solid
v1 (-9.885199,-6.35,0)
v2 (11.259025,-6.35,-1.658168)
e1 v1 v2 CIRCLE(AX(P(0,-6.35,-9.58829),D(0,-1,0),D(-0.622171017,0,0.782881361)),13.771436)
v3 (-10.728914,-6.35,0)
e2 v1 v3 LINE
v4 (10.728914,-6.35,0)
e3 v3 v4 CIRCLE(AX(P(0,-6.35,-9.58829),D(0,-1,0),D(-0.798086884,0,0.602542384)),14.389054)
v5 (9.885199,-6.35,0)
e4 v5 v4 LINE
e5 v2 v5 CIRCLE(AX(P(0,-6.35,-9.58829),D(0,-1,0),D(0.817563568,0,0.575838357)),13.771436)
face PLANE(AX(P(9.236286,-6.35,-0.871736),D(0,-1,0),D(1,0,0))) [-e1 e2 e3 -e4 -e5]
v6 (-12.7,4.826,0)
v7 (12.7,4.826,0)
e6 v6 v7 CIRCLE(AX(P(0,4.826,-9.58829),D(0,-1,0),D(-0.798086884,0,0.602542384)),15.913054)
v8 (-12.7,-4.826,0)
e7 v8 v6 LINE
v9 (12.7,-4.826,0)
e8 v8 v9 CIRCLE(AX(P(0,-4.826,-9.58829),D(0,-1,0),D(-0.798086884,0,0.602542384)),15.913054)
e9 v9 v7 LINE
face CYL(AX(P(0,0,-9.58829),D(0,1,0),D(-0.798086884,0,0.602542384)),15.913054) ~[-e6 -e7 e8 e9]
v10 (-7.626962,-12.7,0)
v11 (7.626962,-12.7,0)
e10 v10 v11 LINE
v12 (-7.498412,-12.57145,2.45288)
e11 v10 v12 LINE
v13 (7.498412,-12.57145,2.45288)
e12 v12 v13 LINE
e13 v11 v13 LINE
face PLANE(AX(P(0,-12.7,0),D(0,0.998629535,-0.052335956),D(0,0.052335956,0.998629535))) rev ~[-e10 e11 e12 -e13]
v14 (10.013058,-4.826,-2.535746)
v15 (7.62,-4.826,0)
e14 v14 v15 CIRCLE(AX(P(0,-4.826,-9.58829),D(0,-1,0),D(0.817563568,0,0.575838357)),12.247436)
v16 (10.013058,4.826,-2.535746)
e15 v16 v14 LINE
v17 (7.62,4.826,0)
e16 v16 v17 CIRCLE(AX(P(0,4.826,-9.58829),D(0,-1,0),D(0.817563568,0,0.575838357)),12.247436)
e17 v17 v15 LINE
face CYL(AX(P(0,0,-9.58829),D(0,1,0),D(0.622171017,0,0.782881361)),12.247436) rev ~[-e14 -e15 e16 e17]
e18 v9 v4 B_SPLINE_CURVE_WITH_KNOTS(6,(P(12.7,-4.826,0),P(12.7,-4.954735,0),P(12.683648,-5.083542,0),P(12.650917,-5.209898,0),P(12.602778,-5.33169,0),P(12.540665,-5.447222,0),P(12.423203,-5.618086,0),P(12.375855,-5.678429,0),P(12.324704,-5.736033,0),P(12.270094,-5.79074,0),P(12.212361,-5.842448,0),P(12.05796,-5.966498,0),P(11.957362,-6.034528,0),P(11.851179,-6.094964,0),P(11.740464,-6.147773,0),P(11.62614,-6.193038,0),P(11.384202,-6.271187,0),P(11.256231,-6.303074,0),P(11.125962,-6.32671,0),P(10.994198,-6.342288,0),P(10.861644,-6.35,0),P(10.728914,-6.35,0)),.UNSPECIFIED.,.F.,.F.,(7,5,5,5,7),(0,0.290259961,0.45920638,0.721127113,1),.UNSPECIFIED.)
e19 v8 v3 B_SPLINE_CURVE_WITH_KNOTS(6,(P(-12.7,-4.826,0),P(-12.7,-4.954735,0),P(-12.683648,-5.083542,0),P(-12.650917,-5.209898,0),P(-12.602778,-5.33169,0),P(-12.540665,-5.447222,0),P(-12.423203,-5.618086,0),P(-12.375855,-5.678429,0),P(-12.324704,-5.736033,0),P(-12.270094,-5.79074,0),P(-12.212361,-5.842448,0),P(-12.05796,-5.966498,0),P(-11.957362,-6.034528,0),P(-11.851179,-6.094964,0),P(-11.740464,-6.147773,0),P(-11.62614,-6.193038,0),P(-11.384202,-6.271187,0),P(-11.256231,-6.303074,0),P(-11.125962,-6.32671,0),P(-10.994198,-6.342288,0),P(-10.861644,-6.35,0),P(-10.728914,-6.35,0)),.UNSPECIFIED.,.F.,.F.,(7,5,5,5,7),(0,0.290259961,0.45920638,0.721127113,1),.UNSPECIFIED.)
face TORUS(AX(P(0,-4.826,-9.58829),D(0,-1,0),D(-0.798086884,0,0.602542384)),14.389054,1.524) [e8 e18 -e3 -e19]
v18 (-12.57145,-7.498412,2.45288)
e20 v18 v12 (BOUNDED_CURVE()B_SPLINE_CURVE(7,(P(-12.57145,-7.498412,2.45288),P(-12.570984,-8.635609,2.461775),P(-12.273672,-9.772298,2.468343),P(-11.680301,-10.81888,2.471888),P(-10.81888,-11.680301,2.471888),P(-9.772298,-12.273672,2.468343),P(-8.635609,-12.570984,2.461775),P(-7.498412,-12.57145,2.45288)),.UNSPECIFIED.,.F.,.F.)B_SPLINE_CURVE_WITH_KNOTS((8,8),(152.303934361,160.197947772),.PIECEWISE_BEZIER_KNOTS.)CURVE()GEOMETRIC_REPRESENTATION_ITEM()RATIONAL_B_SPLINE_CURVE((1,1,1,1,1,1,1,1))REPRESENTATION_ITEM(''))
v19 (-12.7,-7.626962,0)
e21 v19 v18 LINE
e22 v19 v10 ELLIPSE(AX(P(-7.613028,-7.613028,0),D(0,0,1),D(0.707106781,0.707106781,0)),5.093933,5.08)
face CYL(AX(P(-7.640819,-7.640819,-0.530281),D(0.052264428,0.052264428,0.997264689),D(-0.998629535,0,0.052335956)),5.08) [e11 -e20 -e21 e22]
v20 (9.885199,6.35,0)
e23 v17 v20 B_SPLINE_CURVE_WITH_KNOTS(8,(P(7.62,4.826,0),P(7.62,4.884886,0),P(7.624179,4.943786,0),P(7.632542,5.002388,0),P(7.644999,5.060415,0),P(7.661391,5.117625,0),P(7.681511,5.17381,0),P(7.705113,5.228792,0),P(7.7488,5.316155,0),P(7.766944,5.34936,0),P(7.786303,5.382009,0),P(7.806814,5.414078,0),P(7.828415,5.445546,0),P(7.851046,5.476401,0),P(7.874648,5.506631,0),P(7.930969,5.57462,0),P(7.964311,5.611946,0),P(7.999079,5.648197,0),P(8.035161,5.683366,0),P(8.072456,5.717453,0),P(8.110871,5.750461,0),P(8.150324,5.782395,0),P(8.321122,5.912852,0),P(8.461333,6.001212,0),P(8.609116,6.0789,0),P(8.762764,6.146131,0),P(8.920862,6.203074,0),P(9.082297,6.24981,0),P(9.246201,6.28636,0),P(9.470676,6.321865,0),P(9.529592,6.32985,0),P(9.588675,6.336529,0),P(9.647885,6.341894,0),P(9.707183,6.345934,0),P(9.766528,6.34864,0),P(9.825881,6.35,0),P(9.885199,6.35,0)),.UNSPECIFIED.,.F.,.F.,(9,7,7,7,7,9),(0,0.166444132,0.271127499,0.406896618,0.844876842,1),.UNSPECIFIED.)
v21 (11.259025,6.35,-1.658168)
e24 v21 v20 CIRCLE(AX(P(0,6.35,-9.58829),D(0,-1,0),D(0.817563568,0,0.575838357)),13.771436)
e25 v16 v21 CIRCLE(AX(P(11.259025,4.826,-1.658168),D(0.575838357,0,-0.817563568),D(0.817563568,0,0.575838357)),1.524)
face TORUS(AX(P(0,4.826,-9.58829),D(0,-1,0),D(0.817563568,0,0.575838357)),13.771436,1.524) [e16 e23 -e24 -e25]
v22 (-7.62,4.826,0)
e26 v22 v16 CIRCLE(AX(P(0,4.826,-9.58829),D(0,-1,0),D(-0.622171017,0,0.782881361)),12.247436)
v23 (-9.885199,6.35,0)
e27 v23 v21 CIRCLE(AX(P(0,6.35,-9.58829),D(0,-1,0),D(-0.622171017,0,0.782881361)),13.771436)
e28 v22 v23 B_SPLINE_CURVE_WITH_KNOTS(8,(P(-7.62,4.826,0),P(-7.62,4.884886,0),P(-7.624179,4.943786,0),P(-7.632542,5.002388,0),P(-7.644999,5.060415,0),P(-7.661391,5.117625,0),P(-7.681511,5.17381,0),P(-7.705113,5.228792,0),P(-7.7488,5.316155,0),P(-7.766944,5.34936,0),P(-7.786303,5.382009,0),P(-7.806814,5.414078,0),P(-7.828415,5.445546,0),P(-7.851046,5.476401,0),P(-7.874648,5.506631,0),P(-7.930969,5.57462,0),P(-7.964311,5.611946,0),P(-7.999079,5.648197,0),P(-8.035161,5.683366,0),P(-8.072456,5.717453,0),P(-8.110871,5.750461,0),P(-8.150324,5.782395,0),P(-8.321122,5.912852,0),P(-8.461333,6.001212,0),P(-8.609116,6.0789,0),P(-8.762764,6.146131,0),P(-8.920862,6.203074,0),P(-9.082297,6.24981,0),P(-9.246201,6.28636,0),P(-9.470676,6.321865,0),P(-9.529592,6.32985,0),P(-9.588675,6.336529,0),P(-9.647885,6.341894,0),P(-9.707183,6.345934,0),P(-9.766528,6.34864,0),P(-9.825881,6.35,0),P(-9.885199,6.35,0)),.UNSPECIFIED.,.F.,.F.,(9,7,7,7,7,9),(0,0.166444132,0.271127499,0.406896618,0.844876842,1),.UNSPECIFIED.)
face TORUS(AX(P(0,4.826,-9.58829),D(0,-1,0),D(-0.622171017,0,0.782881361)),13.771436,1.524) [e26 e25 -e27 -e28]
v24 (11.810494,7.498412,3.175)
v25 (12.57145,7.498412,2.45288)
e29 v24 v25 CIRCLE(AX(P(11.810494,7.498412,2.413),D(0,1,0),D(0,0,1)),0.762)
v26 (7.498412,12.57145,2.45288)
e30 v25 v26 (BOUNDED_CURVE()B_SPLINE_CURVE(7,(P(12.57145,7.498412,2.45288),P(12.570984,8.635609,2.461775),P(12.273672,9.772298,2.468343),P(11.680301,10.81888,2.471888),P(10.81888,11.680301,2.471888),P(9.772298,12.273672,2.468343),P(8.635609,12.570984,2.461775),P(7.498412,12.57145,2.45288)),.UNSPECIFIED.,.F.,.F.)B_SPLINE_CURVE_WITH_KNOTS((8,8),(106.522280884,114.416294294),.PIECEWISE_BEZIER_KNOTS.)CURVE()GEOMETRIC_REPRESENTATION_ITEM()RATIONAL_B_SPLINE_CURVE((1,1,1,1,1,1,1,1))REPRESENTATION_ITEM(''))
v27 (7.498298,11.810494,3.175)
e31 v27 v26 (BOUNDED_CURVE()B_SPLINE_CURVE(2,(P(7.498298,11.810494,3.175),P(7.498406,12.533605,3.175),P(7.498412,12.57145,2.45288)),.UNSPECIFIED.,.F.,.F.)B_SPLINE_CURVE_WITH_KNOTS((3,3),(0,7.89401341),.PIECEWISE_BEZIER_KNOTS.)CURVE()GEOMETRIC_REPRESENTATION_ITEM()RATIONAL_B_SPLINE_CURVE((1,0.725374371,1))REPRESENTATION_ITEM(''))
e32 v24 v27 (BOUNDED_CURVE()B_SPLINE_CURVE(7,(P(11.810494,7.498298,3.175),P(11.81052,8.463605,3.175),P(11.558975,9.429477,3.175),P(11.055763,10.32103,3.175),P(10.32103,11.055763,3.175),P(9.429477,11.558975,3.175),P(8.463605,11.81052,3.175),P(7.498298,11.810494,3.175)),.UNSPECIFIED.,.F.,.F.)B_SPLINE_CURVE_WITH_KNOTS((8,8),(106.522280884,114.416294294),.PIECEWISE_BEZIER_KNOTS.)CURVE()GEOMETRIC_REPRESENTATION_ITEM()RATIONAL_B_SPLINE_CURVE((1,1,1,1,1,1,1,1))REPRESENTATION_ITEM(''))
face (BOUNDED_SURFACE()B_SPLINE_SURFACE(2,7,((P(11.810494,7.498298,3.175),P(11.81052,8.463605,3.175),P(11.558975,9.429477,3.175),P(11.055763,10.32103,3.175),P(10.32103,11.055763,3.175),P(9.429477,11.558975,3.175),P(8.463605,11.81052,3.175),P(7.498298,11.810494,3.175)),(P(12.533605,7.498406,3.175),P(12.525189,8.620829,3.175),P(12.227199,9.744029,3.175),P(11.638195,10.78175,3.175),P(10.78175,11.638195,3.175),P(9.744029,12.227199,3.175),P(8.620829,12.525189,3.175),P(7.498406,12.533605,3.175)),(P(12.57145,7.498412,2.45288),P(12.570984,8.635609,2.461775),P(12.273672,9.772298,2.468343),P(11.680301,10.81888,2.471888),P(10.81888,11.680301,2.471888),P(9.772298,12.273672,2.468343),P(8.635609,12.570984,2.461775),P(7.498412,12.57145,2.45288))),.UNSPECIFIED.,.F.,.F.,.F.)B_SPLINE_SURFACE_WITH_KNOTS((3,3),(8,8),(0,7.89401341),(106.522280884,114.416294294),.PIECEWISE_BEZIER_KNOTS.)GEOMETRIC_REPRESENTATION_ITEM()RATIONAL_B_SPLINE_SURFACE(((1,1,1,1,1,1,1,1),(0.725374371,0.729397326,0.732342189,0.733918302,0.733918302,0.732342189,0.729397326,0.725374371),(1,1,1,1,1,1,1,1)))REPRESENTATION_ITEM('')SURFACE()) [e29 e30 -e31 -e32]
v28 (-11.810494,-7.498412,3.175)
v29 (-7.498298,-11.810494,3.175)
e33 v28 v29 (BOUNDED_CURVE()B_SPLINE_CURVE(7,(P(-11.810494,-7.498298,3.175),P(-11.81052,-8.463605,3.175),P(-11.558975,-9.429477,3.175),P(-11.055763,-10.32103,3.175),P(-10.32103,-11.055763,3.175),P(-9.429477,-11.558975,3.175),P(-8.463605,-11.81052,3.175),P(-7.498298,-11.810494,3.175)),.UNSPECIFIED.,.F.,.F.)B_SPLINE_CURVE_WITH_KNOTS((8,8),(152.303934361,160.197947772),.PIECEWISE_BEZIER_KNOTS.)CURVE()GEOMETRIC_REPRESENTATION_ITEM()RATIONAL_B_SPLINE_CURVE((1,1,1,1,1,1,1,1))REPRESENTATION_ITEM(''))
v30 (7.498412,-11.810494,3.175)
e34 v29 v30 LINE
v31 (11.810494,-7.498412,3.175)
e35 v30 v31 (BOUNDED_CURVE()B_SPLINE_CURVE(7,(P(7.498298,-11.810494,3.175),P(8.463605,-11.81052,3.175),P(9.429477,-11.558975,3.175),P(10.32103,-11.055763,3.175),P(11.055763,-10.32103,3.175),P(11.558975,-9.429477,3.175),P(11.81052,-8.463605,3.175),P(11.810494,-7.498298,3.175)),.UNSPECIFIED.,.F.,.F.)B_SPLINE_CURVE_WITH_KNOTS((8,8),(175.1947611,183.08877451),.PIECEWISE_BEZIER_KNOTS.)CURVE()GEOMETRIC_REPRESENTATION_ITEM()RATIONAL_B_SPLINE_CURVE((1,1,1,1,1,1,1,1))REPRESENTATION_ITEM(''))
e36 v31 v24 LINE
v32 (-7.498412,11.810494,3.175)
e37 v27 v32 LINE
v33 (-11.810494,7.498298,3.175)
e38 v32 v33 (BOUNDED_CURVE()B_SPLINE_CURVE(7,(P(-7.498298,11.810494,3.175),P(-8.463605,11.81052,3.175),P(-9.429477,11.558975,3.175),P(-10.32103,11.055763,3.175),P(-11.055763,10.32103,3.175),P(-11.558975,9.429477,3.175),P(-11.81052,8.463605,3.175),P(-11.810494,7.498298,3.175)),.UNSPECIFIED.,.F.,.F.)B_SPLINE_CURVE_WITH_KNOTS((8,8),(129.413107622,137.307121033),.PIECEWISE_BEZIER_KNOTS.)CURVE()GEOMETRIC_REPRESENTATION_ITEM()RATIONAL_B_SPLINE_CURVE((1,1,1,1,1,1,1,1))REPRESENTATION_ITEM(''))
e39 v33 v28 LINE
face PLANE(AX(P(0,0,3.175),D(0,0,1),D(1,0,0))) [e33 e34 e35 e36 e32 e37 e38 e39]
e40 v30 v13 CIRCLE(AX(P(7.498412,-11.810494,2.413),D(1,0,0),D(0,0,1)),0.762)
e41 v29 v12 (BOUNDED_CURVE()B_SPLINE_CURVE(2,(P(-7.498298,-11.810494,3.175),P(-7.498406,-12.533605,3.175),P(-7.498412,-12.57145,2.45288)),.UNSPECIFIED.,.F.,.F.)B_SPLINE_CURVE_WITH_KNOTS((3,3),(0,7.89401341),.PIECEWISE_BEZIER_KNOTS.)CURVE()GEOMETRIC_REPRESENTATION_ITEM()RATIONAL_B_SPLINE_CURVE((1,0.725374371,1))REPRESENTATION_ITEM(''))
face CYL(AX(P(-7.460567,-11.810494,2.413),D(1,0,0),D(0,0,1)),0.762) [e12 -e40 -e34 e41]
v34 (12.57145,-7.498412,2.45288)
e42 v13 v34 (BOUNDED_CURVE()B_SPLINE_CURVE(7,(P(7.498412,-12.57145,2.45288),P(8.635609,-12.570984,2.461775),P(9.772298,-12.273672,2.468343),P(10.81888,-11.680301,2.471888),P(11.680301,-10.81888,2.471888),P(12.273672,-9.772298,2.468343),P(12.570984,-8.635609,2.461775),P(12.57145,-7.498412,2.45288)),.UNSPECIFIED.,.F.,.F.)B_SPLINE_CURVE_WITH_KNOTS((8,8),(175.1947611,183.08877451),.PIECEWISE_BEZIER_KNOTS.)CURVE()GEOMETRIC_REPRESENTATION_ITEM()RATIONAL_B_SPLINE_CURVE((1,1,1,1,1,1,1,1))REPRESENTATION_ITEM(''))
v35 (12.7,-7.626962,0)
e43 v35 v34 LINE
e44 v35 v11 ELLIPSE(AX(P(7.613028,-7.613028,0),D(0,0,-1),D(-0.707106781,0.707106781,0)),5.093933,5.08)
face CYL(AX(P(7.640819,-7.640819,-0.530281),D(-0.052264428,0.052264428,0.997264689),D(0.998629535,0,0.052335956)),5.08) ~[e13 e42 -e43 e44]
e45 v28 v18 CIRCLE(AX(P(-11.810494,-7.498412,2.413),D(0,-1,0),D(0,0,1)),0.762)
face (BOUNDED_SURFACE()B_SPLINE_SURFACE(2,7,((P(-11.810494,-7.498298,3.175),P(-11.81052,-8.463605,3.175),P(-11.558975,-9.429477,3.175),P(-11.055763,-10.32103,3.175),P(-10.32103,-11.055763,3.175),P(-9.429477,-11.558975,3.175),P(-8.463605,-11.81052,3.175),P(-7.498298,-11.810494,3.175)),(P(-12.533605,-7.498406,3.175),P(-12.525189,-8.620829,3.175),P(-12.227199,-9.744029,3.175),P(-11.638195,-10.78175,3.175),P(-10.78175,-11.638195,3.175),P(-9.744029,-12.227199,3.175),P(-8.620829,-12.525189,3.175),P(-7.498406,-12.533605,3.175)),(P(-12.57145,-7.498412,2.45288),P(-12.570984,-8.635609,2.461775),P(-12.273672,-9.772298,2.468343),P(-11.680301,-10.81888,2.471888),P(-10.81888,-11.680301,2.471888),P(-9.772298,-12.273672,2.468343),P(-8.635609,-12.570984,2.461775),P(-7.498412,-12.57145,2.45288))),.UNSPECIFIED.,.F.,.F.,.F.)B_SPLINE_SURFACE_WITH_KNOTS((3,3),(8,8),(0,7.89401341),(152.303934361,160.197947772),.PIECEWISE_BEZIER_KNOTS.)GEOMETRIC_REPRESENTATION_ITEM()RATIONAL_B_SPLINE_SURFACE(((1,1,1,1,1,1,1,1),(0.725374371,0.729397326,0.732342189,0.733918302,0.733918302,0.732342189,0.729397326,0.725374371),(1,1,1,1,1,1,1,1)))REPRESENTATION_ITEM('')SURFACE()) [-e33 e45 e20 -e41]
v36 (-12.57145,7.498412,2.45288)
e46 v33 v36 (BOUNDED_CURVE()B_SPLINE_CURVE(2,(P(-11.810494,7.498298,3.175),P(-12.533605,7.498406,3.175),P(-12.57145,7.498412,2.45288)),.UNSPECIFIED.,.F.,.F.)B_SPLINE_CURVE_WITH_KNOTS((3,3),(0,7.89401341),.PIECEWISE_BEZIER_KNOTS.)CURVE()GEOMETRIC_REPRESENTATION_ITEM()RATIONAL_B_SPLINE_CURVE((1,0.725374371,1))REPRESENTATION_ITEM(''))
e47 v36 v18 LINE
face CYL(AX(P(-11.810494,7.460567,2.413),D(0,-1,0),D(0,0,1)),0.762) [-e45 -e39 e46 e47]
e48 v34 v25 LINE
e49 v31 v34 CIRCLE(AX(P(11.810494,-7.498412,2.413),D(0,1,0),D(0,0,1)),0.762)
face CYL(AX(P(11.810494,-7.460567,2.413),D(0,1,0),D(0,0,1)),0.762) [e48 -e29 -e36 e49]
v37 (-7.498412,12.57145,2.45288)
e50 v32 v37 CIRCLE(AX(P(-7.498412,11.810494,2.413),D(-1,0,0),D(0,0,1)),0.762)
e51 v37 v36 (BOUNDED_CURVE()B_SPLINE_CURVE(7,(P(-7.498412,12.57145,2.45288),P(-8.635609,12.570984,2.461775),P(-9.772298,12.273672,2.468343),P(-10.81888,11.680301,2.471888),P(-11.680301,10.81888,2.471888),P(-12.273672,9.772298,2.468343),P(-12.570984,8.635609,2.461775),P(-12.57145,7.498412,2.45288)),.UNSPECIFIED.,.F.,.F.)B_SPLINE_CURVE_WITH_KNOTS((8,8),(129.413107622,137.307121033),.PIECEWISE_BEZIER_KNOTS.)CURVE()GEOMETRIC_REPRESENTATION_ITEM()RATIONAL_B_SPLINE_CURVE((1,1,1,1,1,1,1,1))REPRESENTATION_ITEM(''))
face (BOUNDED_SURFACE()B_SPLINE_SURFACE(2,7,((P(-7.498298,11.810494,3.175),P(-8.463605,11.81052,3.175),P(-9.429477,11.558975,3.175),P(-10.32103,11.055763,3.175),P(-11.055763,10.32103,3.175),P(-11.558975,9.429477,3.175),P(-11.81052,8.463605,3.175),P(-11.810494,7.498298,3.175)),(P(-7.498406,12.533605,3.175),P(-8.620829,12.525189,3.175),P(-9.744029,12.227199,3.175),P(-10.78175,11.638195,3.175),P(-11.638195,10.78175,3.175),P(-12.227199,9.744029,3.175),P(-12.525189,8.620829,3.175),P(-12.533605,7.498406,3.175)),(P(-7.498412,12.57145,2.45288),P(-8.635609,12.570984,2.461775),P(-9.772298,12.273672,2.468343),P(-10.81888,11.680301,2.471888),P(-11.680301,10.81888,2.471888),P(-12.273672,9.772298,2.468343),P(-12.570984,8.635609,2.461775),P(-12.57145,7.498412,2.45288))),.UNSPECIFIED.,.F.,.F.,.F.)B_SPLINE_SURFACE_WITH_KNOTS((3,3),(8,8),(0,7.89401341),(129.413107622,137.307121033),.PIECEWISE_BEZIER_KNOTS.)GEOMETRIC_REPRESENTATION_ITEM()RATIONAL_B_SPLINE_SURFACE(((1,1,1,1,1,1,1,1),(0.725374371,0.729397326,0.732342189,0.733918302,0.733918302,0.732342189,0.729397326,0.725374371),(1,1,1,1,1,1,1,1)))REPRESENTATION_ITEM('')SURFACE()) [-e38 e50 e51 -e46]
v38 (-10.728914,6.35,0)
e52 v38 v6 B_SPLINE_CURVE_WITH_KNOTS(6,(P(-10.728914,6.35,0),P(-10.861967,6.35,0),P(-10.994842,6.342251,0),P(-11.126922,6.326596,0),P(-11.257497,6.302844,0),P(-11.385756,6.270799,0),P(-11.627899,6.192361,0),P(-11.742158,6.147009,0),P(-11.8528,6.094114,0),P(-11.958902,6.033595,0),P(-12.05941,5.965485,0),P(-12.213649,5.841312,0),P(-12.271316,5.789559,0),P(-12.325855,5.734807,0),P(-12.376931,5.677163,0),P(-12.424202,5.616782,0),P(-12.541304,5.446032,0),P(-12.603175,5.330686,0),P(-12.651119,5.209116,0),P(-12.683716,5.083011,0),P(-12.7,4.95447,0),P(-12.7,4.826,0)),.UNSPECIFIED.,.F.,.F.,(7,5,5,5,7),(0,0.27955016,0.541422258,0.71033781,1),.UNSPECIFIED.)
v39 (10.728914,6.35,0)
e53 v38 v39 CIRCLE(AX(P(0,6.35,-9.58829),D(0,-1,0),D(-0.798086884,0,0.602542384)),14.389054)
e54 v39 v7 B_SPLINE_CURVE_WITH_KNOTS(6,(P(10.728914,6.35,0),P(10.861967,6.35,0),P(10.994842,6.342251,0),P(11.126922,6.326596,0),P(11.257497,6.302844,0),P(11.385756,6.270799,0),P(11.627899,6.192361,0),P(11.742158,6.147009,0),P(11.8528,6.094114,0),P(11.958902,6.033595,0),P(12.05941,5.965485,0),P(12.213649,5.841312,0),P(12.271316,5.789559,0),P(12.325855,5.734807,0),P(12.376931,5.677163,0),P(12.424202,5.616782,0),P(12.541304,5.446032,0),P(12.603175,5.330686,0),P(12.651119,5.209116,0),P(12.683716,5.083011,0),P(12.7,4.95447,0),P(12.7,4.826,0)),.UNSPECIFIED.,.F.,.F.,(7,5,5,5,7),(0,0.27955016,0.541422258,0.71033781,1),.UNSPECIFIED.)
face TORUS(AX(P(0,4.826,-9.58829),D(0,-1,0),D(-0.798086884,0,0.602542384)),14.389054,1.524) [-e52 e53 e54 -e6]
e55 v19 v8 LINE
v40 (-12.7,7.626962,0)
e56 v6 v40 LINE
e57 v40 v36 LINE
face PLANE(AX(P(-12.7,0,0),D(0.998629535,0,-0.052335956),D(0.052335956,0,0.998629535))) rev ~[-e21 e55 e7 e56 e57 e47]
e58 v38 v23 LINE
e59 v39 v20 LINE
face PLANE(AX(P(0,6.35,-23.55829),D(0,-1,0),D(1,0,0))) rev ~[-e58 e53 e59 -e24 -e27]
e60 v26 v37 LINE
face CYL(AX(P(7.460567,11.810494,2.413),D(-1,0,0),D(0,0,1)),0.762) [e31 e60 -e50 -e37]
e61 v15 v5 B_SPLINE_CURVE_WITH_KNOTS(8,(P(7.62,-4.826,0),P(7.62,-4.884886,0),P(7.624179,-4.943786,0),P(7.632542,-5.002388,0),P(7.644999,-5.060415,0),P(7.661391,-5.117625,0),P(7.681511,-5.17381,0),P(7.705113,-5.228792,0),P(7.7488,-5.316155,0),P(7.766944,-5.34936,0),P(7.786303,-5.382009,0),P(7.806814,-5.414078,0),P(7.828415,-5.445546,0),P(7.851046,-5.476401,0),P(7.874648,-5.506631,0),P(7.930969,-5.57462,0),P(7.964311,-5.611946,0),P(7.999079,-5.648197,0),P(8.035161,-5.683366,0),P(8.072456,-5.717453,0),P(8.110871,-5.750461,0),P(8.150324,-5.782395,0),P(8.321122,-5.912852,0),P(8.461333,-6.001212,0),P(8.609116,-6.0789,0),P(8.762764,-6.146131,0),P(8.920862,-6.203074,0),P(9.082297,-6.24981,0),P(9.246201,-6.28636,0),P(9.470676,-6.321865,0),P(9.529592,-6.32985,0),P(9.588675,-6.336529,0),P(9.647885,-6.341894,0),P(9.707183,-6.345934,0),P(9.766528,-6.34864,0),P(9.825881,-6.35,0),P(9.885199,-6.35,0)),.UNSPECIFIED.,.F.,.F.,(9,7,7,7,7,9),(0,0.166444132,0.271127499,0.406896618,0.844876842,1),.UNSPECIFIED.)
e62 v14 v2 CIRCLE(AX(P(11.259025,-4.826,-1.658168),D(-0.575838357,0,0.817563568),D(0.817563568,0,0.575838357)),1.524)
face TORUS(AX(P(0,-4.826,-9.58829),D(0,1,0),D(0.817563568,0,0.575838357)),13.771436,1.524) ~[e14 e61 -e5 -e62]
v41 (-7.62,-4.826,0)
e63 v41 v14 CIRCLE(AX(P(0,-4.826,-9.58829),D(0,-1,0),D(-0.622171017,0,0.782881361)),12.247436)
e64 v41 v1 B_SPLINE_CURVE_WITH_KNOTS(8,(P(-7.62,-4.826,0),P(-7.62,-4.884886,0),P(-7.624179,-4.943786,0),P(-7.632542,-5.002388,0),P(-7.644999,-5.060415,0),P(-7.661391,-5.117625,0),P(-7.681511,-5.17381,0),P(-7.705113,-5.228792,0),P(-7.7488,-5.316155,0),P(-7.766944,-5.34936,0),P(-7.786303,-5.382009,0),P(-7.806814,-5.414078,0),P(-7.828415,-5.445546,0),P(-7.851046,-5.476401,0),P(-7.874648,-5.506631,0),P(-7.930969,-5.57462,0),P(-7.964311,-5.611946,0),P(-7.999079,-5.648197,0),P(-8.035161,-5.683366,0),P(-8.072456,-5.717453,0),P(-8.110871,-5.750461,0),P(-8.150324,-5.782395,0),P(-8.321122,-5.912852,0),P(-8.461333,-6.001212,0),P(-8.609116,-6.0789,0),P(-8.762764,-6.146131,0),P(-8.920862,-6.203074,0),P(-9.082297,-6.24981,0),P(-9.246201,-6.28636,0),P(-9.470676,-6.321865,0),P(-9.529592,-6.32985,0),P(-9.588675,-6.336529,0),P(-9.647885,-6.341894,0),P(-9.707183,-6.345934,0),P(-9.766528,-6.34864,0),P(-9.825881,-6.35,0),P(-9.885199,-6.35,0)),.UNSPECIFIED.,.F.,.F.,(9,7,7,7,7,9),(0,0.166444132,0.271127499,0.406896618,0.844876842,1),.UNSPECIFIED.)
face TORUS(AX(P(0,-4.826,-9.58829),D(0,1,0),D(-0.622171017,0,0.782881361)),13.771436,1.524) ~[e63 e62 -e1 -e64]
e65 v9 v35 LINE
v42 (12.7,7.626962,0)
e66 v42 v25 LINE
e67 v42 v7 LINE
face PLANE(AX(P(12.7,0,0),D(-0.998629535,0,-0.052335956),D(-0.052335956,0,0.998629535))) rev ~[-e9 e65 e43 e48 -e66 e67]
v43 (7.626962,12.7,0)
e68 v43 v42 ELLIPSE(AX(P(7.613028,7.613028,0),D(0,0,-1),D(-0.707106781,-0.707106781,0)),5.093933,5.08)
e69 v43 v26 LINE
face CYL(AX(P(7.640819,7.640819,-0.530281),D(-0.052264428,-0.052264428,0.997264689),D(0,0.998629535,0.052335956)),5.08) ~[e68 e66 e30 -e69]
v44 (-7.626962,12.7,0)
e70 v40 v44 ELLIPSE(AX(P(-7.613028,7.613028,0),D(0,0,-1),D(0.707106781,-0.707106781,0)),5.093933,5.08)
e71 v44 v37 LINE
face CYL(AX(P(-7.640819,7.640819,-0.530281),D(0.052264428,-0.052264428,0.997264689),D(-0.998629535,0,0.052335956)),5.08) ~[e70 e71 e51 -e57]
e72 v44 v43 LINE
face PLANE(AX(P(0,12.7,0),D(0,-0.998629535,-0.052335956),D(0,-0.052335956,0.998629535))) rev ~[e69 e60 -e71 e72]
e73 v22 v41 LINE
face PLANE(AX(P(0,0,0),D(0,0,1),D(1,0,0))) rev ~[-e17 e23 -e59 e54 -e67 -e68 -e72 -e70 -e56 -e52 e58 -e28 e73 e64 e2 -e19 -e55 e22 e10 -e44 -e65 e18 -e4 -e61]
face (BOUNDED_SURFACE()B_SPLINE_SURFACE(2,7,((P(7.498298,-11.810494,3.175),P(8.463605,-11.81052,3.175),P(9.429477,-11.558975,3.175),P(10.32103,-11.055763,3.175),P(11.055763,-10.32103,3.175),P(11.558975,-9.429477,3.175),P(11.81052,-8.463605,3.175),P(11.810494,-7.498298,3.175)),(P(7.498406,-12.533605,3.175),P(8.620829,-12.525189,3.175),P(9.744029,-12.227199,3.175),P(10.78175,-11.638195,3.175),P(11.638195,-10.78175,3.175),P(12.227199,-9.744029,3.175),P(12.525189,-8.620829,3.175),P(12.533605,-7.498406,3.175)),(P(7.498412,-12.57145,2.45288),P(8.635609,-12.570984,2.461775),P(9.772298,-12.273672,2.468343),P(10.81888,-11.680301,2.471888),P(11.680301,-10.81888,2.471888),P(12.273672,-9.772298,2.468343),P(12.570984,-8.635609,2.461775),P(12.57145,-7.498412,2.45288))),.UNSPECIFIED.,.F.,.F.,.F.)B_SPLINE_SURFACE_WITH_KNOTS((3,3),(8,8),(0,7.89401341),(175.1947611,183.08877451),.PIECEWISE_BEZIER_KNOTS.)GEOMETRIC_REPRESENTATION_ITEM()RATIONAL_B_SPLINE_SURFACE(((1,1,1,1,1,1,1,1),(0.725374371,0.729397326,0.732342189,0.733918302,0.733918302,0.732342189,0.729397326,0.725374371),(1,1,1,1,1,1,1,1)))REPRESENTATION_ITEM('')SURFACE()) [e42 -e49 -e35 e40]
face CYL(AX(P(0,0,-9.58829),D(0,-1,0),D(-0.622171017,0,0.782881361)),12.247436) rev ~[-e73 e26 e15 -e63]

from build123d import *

# Parameters (mm, degrees)
F0_W          = 25.4
F0_H          = 25.4
F1_DEPTH      = 3.175
F1_TAPER      = 3
F3_W          = 5.08
F3_H          = 12.7
F6_DEPTH      = 6.35
F6_DEPTH_BACK = 6.35
F7_R          = 5.08
F8_R          = 1.524
F9_R          = 0.762


with BuildPart() as f1:
    # F0 (on Top) → F1 (new body)
    with BuildSketch(Plane.XY):
        Rectangle(F0_W, F0_H)
    extrude(amount=F1_DEPTH, taper=F1_TAPER)

    # F4: sweep along a path in F2
    with BuildLine(Plane.XZ) as f4_path:
        ThreePointArc((-10.16, 0), (0, -23.5582897328), (10.16, 0))
    # F3 (on face) → F4 (sweep)
    with BuildSketch(Plane(origin=(0, 0, 0), x_dir=(1, 0, 0), z_dir=(0, 0, -1))):
        with Locations((-10.16, 0)):
            Rectangle(F3_W, F3_H)
    sweep(path=f4_path.line)

    # F5 (on Front) → F6 (join, two sides)
    with BuildSketch(Plane.XZ) as f6_sk:
        with BuildLine():
            Line((10.0130578512, -2.535746045), (10.16, 0))
            Line((10.16, 0), (7.62, 0))
            ThreePointArc((7.62, 0), (8.9072265211, -1.1822790439), (10.0130578512, -2.535746045))
        make_face()
    extrude(amount=F6_DEPTH)
    extrude(f6_sk.sketch, amount=-F6_DEPTH_BACK)

    # F7
    f7_edges = [f1.edges().sort_by_distance(p)[0] for p in [
        (12.616803, -12.616803, 1.5875),
        (12.616803, 12.616803, 1.5875),
        (-12.616803, 12.616803, 1.5875),
        (-12.616803, -12.616803, 1.5875),
    ]]
    fillet(f7_edges, radius=F7_R)

    # F8
    f8_edges = [f1.edges().sort_by_distance(p)[0] for p in [
        (-1.743325, 6.35, -21.711017),
        (-1.743325, -6.35, -21.711017),
        (8.907227, -6.35, -1.182279),
        (0, -6.35, -25.501344),
        (0, 6.35, -25.501344),
        (8.907227, 6.35, -1.182279),
    ]]
    fillet(f8_edges, radius=F8_R)

    # F9
    f9_edges = [f1.edges().sort_by_distance(p)[0] for p in [
        (12.533605, 0, 3.175),
        (11.048589, -11.048589, 3.175),
        (11.048589, 11.048589, 3.175),
        (0, -12.533605, 3.175),
        (0, 12.533605, 3.175),
        (-11.048589, -11.048589, 3.175),
        (-11.048589, 11.048589, 3.175),
        (-12.533605, 0, 3.175),
    ]]
    fillet(f9_edges, radius=F9_R)


solid = f1.part
